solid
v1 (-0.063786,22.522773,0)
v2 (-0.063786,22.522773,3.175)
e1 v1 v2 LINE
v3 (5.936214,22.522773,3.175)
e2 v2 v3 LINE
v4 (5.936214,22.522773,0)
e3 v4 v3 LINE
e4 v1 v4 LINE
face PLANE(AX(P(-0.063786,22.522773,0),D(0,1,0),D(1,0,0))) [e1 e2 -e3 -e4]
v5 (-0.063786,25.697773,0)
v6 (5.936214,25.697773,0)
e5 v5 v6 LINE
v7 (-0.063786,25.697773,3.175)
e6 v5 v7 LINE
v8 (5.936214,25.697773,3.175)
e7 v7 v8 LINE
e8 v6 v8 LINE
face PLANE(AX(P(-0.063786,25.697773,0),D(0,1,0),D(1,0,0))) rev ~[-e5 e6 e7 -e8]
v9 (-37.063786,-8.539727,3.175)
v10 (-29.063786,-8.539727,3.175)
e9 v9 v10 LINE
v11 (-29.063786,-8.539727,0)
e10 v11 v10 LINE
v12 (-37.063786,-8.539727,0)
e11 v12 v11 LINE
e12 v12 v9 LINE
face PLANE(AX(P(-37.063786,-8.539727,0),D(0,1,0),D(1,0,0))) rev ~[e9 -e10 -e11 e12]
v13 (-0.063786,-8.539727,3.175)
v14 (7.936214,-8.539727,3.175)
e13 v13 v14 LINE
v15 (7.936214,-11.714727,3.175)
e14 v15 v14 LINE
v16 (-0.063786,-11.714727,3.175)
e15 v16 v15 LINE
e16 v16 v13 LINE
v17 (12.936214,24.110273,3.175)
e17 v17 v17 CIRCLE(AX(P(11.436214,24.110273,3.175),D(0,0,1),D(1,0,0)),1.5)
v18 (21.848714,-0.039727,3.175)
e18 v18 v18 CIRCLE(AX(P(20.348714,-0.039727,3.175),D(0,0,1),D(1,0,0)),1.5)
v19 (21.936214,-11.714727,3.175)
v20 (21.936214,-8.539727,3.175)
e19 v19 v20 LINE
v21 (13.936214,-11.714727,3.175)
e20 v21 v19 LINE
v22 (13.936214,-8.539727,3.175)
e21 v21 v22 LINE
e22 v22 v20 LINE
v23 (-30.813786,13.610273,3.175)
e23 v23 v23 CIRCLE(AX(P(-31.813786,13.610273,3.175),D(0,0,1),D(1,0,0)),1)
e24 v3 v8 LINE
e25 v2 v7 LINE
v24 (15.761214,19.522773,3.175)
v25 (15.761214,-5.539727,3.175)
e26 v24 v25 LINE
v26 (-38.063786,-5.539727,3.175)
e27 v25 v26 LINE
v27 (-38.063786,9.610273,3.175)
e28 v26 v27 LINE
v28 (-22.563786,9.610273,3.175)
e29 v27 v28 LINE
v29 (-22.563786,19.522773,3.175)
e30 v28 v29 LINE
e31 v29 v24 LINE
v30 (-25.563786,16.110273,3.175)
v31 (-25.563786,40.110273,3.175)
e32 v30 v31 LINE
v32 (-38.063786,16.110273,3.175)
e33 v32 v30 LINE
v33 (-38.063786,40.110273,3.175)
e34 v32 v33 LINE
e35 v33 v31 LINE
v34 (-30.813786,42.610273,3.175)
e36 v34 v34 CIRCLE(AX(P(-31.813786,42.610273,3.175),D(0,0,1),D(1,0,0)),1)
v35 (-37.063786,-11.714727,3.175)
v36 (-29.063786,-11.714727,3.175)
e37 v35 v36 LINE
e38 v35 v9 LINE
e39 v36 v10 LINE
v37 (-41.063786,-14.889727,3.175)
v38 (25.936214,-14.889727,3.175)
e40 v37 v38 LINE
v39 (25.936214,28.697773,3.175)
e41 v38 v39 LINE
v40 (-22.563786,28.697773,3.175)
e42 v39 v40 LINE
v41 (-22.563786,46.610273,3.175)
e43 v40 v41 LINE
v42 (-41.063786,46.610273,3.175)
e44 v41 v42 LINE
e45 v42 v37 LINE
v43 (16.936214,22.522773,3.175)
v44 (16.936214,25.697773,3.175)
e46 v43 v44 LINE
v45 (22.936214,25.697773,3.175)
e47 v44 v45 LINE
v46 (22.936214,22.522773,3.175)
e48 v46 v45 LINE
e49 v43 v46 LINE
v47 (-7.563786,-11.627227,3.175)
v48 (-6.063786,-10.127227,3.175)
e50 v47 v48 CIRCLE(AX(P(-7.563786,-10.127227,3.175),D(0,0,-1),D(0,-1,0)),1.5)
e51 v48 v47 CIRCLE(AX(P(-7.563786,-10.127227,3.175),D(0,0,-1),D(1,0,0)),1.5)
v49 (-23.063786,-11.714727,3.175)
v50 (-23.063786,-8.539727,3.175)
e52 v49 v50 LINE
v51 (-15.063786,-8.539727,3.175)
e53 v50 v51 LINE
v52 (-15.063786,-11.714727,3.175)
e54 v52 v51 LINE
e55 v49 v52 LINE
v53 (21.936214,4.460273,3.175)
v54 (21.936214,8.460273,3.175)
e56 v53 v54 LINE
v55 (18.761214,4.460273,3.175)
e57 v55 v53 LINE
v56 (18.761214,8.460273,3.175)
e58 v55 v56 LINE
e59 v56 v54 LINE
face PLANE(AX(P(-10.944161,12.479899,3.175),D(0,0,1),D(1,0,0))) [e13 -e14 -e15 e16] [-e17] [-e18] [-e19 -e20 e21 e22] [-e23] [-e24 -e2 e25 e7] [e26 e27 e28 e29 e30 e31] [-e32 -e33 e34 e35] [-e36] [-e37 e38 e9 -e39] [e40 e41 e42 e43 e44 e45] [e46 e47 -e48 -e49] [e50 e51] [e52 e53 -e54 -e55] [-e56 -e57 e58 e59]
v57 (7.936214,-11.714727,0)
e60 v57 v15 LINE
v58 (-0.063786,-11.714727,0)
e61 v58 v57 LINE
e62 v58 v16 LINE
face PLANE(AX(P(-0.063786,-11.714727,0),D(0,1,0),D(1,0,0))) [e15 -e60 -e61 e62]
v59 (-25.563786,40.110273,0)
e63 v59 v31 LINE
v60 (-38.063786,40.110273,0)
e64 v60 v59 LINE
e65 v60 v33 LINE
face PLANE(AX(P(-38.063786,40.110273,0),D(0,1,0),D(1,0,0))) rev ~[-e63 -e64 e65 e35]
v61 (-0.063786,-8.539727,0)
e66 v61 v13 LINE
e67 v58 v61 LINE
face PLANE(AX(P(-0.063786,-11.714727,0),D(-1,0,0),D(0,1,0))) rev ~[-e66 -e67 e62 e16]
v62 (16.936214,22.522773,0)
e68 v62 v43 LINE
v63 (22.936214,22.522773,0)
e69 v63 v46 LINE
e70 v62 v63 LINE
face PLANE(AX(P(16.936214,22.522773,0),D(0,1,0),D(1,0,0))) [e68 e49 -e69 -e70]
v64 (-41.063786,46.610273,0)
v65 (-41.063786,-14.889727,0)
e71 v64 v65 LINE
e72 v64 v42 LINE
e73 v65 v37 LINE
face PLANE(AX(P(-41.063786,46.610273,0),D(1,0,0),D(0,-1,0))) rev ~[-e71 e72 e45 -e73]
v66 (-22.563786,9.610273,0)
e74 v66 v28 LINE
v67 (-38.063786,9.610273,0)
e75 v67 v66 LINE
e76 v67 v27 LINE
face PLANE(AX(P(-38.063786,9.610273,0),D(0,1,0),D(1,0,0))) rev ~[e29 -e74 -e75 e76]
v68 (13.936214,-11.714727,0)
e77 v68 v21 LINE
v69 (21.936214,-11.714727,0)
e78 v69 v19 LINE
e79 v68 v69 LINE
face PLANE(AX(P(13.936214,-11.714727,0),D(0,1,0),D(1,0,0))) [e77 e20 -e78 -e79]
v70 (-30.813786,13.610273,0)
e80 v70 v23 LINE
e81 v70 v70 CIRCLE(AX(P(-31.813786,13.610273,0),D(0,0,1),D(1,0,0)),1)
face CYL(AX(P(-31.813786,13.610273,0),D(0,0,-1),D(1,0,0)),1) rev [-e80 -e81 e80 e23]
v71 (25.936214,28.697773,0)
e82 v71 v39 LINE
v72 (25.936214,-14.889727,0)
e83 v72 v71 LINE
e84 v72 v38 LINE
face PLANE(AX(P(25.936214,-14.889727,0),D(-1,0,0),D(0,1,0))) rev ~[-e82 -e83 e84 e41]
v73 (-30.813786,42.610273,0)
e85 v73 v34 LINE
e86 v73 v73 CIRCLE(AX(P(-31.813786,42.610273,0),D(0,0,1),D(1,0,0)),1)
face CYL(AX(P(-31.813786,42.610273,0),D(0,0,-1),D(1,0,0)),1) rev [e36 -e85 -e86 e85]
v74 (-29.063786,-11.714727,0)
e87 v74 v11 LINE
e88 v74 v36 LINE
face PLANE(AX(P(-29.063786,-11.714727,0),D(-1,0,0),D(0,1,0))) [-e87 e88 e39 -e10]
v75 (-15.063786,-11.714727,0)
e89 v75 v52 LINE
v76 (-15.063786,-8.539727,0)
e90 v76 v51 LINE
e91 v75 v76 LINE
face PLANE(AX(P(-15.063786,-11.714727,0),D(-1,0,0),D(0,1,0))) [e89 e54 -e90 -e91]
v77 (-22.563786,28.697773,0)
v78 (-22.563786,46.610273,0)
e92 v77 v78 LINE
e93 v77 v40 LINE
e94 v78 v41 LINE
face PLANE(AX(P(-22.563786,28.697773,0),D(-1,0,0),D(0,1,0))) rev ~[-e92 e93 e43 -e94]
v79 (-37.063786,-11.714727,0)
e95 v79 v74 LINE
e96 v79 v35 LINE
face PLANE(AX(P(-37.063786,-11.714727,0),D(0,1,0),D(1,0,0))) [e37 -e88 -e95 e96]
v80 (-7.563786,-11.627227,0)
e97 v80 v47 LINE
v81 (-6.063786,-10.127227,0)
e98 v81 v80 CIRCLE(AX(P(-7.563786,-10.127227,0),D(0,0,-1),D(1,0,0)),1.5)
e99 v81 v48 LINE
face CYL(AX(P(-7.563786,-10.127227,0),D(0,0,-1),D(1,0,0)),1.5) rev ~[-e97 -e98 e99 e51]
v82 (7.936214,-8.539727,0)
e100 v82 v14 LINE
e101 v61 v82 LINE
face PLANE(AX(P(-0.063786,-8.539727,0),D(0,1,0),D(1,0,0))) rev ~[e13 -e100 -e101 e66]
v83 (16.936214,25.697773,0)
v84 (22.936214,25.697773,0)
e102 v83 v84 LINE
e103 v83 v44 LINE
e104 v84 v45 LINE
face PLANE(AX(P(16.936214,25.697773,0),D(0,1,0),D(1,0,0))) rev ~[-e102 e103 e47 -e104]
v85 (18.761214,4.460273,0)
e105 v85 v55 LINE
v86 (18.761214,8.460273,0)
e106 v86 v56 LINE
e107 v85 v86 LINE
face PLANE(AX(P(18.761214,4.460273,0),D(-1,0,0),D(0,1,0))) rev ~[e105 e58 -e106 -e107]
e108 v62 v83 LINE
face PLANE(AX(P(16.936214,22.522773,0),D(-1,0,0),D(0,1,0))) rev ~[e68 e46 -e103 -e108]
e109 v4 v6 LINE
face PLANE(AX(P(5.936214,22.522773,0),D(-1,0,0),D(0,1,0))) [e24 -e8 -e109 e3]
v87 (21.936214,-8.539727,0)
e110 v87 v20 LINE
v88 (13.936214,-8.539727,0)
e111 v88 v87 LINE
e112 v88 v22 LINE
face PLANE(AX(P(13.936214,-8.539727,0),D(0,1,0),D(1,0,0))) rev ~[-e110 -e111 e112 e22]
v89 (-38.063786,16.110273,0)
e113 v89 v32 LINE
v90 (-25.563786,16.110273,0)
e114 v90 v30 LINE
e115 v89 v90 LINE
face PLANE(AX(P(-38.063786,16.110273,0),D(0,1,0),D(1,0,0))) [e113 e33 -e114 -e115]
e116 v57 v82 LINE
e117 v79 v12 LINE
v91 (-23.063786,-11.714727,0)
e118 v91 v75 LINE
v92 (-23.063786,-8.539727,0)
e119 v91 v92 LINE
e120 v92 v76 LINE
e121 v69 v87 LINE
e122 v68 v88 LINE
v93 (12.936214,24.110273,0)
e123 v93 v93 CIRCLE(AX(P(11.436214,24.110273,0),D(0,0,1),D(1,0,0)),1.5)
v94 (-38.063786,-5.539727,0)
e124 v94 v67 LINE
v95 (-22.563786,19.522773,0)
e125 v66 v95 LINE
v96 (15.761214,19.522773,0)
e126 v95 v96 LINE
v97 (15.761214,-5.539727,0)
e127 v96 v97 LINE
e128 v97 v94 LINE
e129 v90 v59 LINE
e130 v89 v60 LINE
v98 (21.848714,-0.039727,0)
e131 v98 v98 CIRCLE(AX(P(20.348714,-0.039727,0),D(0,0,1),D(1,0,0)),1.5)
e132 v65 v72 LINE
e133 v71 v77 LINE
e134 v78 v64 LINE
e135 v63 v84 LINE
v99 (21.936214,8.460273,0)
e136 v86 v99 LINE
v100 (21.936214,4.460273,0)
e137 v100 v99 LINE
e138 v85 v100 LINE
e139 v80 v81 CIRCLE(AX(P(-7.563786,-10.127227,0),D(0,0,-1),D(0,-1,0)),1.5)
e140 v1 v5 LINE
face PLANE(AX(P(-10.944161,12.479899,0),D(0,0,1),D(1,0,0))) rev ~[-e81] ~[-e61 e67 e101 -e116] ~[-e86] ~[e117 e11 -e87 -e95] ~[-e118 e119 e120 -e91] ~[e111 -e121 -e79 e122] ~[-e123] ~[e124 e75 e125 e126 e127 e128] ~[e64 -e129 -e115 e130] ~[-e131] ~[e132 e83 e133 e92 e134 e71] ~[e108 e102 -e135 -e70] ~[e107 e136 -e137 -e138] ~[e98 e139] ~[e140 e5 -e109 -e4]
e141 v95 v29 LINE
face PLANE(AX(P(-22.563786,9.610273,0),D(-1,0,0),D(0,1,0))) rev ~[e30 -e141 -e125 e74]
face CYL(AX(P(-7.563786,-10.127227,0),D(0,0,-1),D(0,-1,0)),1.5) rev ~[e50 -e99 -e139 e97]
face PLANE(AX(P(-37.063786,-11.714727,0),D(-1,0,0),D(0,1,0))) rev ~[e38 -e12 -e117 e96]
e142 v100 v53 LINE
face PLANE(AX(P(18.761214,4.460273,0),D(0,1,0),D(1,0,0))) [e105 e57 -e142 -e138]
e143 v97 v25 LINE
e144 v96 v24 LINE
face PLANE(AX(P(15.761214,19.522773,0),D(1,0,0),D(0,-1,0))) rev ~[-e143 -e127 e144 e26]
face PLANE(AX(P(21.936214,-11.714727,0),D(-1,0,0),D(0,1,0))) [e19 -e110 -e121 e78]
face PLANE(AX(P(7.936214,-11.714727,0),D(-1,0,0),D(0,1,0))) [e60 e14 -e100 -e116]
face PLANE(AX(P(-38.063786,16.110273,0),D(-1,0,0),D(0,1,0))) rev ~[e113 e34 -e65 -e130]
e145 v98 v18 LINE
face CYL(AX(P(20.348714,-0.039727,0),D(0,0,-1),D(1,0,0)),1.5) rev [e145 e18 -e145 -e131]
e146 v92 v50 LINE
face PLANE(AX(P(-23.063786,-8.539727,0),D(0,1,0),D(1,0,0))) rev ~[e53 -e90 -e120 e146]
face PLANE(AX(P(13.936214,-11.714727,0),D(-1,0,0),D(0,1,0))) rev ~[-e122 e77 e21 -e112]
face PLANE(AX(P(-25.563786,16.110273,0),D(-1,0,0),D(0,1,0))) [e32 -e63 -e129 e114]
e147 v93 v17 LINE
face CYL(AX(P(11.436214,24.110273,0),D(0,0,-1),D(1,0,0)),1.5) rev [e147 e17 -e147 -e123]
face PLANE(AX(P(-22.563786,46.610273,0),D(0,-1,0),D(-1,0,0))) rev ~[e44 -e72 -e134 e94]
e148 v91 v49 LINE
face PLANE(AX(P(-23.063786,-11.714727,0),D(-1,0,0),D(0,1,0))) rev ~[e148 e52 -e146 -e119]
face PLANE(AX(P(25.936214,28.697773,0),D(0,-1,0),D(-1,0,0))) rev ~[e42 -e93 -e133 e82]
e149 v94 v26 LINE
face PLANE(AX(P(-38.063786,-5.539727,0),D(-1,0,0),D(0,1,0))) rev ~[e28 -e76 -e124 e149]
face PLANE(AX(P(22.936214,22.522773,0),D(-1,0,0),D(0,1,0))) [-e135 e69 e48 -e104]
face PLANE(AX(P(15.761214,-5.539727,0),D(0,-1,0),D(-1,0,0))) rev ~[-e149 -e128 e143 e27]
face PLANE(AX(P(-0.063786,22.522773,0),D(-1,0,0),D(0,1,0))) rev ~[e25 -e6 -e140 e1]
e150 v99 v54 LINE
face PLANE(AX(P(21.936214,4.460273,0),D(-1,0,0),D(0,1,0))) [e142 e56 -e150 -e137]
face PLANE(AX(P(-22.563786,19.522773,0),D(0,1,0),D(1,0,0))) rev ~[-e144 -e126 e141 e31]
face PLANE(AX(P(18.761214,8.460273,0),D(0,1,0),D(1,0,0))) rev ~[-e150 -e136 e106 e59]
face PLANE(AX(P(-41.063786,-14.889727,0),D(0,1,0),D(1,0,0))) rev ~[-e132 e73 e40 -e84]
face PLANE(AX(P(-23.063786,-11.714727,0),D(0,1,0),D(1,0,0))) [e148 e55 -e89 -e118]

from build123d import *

# Parameters (mm, degrees)
F0_W     = 8
F0_H     = 3.175
F0_R     = 1
F0_R_2   = 1.5
F0_W_2   = 3.175
F0_H_2   = 4
F0_W_3   = 12.5
F0_H_3   = 24
F0_W_4   = 6
F1_DEPTH = 3.175


# Not quite as in the source:
# - a length typed as a fraction of an inch, garbled in the dataset ("3 / 203.2 mm" for 3/8 in), is restored


with BuildPart() as f1:
    # F0 (on Top) → F1 (new body)
    with BuildSketch(Plane.XY):
        Polygon((-41.0637862384, -14.8897265702), (-7.5637862384, -14.8897265702), (25.9362137616, -14.8897265702), (25.9362137616, 28.6977734298), (-22.5637862384, 28.6977734298), (-22.5637862384, 46.6102734298), (-41.0637862384, 46.6102734298), align=None)
        with Locations((-33.0637862384, -10.1272265702)):
            Rectangle(F0_W, F0_H, mode=Mode.SUBTRACT)
        with Locations((-19.0637862384, -10.1272265702)):
            Rectangle(F0_W, F0_H, mode=Mode.SUBTRACT)
        with Locations((-31.8137862384, 13.6102734298)):
            Circle(F0_R, mode=Mode.SUBTRACT)
        Polygon((15.7612137616, -5.5397265702), (-38.0637862384, -5.5397265702), (-38.0637862384, 9.6102734298), (-22.5637862384, 9.6102734298), (-22.5637862384, 19.5227734298), (15.7612137616, 19.5227734298), (15.7612137616, 9.6102734298), align=None, mode=Mode.SUBTRACT)
        with BuildLine():
            ThreePointArc((-7.5637862384, -11.6272265702), (-8.6244464102, -9.0665663985), (-6.0637862384, -10.1272265702))
            ThreePointArc((-6.0637862384, -10.1272265702), (-6.5031260667, -11.187886742), (-7.5637862384, -11.6272265702))
        make_face(mode=Mode.SUBTRACT)
        with Locations((3.9362137616, -10.1272265702)):
            Rectangle(F0_W, F0_H, mode=Mode.SUBTRACT)
        with Locations((17.9362137616, -10.1272265702)):
            Rectangle(F0_W, F0_H, mode=Mode.SUBTRACT)
        with Locations((20.3487137616, -0.0397265702)):
            Circle(F0_R_2, mode=Mode.SUBTRACT)
        with Locations((20.3487137616, 6.4602734298)):
            Rectangle(F0_W_2, F0_H_2, mode=Mode.SUBTRACT)
        with Locations((-31.8137862384, 28.1102734298)):
            Rectangle(F0_W_3, F0_H_3, mode=Mode.SUBTRACT)
        with Locations((-31.8137862384, 42.6102734298)):
            Circle(F0_R, mode=Mode.SUBTRACT)
        with Locations((2.9362137616, 24.1102734298)):
            Rectangle(F0_W_4, F0_H, mode=Mode.SUBTRACT)
        with Locations((11.4362137616, 24.1102734298)):
            Circle(F0_R_2, mode=Mode.SUBTRACT)
        with Locations((19.9362137616, 24.1102734298)):
            Rectangle(F0_W_4, F0_H, mode=Mode.SUBTRACT)
    extrude(amount=F1_DEPTH)


solid = f1.part
